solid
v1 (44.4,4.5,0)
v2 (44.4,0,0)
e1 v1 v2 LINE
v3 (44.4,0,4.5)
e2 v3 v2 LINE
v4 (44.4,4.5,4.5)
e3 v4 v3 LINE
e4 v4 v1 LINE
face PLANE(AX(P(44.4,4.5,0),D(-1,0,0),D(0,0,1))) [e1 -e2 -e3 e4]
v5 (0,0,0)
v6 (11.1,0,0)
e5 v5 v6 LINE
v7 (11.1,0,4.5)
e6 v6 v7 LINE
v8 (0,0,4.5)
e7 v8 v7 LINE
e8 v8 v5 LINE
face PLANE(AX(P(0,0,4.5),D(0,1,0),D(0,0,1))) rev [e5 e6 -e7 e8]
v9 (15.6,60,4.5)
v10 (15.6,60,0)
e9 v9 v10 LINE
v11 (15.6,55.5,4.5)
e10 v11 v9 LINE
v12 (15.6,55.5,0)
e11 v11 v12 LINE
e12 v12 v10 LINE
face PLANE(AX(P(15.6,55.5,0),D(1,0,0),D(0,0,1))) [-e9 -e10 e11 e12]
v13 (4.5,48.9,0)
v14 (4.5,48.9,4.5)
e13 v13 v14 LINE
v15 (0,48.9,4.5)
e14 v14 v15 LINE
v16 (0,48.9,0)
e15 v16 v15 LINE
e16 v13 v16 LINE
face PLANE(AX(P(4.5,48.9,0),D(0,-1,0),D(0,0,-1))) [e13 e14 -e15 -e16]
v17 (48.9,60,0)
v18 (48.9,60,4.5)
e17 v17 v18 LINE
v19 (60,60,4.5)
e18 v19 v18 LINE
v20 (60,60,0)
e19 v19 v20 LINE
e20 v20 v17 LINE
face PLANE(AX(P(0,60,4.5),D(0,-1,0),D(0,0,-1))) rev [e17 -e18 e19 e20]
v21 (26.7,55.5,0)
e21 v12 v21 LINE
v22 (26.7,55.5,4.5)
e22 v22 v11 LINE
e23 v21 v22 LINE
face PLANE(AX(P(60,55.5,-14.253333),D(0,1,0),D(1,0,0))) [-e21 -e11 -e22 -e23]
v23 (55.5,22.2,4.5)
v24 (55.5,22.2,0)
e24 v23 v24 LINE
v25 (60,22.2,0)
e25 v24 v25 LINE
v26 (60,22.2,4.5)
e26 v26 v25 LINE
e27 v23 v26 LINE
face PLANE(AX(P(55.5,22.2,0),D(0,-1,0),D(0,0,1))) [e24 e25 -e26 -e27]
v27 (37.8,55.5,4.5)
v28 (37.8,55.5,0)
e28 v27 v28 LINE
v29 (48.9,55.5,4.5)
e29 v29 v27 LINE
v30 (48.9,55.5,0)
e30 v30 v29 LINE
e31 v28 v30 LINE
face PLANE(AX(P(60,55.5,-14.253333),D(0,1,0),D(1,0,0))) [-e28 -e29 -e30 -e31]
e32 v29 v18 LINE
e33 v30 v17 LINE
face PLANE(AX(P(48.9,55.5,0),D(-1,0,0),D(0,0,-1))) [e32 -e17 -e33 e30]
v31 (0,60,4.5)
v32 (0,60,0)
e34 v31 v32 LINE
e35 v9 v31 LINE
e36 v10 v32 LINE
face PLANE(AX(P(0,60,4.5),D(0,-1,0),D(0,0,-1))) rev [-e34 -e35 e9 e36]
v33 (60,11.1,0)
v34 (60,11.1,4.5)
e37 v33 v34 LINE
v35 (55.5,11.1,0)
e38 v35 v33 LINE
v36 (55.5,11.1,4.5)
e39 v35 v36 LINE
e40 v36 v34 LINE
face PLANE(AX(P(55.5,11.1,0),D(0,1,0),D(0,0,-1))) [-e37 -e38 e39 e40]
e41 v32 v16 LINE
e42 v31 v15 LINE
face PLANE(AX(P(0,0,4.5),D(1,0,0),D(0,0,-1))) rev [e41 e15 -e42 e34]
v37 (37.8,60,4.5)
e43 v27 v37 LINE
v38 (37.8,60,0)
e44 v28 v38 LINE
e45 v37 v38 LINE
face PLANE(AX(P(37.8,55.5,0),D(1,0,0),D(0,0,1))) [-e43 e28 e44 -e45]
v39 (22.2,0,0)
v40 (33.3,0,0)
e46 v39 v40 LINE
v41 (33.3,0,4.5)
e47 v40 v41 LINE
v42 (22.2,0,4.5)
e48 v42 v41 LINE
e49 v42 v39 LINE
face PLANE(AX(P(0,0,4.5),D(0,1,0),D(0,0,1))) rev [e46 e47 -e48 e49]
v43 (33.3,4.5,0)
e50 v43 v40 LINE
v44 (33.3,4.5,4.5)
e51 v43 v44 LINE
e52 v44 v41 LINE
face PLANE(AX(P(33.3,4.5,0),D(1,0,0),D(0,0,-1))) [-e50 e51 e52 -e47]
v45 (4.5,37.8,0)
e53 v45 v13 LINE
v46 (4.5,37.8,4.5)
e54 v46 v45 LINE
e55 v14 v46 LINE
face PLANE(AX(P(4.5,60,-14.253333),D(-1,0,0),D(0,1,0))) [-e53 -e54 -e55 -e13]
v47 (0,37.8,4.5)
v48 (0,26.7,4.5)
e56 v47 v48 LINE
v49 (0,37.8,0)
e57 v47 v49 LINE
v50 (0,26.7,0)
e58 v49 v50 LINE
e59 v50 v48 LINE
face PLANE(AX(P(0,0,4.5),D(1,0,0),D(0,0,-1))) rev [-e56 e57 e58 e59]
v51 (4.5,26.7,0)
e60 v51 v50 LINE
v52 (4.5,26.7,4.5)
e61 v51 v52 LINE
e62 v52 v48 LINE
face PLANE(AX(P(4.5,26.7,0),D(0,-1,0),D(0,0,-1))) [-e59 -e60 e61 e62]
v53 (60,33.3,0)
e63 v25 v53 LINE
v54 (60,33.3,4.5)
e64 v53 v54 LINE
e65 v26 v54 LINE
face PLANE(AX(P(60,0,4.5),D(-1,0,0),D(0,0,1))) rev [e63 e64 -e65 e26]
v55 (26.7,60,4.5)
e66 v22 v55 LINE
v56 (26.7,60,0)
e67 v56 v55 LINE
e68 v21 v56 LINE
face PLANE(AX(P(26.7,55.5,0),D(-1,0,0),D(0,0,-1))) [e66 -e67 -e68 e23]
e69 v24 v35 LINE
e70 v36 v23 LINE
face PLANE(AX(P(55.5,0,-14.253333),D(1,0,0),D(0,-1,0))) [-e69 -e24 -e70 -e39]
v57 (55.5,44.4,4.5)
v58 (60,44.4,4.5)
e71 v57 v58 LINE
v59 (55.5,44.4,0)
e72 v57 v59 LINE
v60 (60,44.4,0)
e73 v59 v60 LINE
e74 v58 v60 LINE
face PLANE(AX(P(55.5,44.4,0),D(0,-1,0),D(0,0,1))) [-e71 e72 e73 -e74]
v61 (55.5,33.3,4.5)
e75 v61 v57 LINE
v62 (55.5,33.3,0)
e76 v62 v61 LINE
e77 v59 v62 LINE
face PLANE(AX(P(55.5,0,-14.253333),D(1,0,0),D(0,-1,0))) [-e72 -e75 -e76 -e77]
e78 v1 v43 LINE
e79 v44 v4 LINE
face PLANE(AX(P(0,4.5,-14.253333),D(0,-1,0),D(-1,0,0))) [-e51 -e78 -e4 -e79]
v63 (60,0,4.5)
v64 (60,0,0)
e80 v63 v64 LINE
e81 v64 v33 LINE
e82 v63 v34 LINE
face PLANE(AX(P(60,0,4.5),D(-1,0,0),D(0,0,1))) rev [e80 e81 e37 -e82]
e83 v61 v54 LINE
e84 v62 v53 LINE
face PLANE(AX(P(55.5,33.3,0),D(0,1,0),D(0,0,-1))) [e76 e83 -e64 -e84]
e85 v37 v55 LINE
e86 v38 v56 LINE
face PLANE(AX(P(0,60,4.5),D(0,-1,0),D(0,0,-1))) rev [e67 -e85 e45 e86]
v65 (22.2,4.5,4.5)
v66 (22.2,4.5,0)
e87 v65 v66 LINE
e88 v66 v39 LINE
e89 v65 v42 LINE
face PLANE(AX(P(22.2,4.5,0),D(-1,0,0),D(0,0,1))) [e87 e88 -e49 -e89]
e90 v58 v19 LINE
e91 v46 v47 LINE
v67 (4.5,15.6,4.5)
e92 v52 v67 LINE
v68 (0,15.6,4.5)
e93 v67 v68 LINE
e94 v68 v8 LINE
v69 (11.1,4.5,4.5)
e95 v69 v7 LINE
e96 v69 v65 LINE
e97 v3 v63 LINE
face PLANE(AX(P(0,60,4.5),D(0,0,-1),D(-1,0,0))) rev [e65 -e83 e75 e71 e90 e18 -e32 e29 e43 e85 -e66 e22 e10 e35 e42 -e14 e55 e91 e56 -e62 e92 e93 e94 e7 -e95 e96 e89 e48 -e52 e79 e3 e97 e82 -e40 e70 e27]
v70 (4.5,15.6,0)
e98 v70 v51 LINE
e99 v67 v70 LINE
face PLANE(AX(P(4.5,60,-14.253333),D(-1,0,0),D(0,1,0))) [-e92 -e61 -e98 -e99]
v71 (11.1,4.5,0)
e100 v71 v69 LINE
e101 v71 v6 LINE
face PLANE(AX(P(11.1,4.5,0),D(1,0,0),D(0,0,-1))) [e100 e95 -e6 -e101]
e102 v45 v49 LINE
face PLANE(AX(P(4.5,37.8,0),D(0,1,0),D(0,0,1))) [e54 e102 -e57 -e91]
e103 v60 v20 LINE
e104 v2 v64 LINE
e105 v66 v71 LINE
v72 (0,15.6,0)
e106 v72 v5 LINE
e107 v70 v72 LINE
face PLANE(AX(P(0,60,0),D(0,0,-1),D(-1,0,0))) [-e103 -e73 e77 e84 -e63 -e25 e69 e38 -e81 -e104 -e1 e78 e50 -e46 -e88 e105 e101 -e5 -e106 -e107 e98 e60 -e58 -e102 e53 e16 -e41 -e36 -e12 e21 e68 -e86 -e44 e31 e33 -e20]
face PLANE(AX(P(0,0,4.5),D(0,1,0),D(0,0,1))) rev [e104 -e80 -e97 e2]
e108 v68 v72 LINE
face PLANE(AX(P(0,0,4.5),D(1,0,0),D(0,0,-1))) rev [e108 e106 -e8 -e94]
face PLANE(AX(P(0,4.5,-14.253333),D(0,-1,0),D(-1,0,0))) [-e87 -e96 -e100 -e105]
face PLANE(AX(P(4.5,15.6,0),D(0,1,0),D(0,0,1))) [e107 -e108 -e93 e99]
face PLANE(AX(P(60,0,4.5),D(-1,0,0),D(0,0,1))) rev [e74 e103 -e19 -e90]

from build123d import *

# Parameters (mm, degrees)
SKETCH1_W           = 60
SKETCH1_H           = 60
BOSS_EXTRUDE1_DEPTH = 4.5
CAVITY1_OUTLINE_W   = 11.1
CAVITY1_OUTLINE_H   = 4.5
CAVITY1_DEPTH       = 4.5
CAVITY1_START       = 55.5
CAVITY1_2_OUTLINE_W = 11.1
CAVITY1_2_OUTLINE_H = 4.5
CAVITY1_2_DEPTH     = 4.5
CAVITY1_START_2     = 15.6
CAVITY1_3_OUTLINE_W = 4.5
CAVITY1_3_OUTLINE_H = 4.5
CAVITY1_3_DEPTH     = 6.6
CAVITY1_START_3     = 37.8
CAVITY1_4_OUTLINE_W = 4.5
CAVITY1_4_OUTLINE_H = 4.5
CAVITY1_4_DEPTH     = 6.6
CAVITY1_START_4     = 11.1
CAVITY1_5_OUTLINE_W = 4.5
CAVITY1_5_OUTLINE_H = 4.5
CAVITY1_5_DEPTH     = 4.5
CAVITY1_START_5     = 22.2
CAVITY1_6_OUTLINE_W = 4.5
CAVITY1_6_OUTLINE_H = 4.5
CAVITY1_6_DEPTH     = 4.5
CAVITY1_START_6     = 33.3
CAVITY1_7_OUTLINE_W = 4.5
CAVITY1_7_OUTLINE_H = 4.5
CAVITY1_7_DEPTH     = 4.5
CAVITY1_START_7     = 44.4
CAVITY1_8_OUTLINE_W = 4.5
CAVITY1_8_OUTLINE_H = 4.5
CAVITY1_8_DEPTH     = 4.5


# Read off the part's stored shape, not the designer's step: Cavity1
with BuildPart() as part:
    # Sketch1 → Boss-Extrude1 (new body)
    with BuildSketch(Plane.XY):
        with Locations((30, 30)):
            Rectangle(SKETCH1_W, SKETCH1_H)
    extrude(amount=BOSS_EXTRUDE1_DEPTH)

    # Cavity1 outline → Cavity1 (cut)
    with BuildSketch(Plane.YZ):
        with Locations((21.15, 2.25)):
            Rectangle(CAVITY1_OUTLINE_W, CAVITY1_OUTLINE_H)
        with Locations((43.35, 2.25)):
            Rectangle(CAVITY1_OUTLINE_W, CAVITY1_OUTLINE_H)
    extrude(amount=CAVITY1_DEPTH, mode=Mode.SUBTRACT)

    # Cavity1 2 outline → Cavity1 2 (cut)
    with BuildSketch(Plane.YZ.offset(CAVITY1_START)):
        with Locations((16.65, 2.25)):
            Rectangle(CAVITY1_2_OUTLINE_W, CAVITY1_2_OUTLINE_H)
        with Locations((38.85, 2.25)):
            Rectangle(CAVITY1_2_OUTLINE_W, CAVITY1_2_OUTLINE_H)
    extrude(amount=CAVITY1_2_DEPTH, mode=Mode.SUBTRACT)

    # Cavity1 3 outline → Cavity1 3 (cut)
    with BuildSketch(Plane.YZ.offset(CAVITY1_START_2)):
        with Locations((2.25, 2.25)):
            Rectangle(CAVITY1_3_OUTLINE_W, CAVITY1_3_OUTLINE_H)
        with Locations((57.75, 2.25)):
            Rectangle(CAVITY1_3_OUTLINE_W, CAVITY1_3_OUTLINE_H)
    extrude(amount=CAVITY1_3_DEPTH, mode=Mode.SUBTRACT)

    # Cavity1 4 outline → Cavity1 4 (cut)
    with BuildSketch(Plane.YZ.offset(CAVITY1_START_3)):
        with Locations((2.25, 2.25)):
            Rectangle(CAVITY1_4_OUTLINE_W, CAVITY1_4_OUTLINE_H)
        with Locations((57.75, 2.25)):
            Rectangle(CAVITY1_4_OUTLINE_W, CAVITY1_4_OUTLINE_H)
    extrude(amount=CAVITY1_4_DEPTH, mode=Mode.SUBTRACT)

    # Cavity1 5 outline → Cavity1 5 (cut)
    with BuildSketch(Plane.YZ.offset(CAVITY1_START_4)):
        with Locations((2.25, 2.25)):
            Rectangle(CAVITY1_5_OUTLINE_W, CAVITY1_5_OUTLINE_H)
    extrude(amount=CAVITY1_5_DEPTH, mode=Mode.SUBTRACT)

    # Cavity1 6 outline → Cavity1 6 (cut)
    with BuildSketch(Plane.YZ.offset(CAVITY1_START_5)):
        with Locations((57.75, 2.25)):
            Rectangle(CAVITY1_6_OUTLINE_W, CAVITY1_6_OUTLINE_H)
    extrude(amount=CAVITY1_6_DEPTH, mode=Mode.SUBTRACT)

    # Cavity1 7 outline → Cavity1 7 (cut)
    with BuildSketch(Plane.YZ.offset(CAVITY1_START_6)):
        with Locations((2.25, 2.25)):
            Rectangle(CAVITY1_7_OUTLINE_W, CAVITY1_7_OUTLINE_H)
    extrude(amount=CAVITY1_7_DEPTH, mode=Mode.SUBTRACT)

    # Cavity1 8 outline → Cavity1 8 (cut)
    with BuildSketch(Plane.YZ.offset(CAVITY1_START_7)):
        with Locations((57.75, 2.25)):
            Rectangle(CAVITY1_8_OUTLINE_W, CAVITY1_8_OUTLINE_H)
    extrude(amount=CAVITY1_8_DEPTH, mode=Mode.SUBTRACT)


solid = part.part
